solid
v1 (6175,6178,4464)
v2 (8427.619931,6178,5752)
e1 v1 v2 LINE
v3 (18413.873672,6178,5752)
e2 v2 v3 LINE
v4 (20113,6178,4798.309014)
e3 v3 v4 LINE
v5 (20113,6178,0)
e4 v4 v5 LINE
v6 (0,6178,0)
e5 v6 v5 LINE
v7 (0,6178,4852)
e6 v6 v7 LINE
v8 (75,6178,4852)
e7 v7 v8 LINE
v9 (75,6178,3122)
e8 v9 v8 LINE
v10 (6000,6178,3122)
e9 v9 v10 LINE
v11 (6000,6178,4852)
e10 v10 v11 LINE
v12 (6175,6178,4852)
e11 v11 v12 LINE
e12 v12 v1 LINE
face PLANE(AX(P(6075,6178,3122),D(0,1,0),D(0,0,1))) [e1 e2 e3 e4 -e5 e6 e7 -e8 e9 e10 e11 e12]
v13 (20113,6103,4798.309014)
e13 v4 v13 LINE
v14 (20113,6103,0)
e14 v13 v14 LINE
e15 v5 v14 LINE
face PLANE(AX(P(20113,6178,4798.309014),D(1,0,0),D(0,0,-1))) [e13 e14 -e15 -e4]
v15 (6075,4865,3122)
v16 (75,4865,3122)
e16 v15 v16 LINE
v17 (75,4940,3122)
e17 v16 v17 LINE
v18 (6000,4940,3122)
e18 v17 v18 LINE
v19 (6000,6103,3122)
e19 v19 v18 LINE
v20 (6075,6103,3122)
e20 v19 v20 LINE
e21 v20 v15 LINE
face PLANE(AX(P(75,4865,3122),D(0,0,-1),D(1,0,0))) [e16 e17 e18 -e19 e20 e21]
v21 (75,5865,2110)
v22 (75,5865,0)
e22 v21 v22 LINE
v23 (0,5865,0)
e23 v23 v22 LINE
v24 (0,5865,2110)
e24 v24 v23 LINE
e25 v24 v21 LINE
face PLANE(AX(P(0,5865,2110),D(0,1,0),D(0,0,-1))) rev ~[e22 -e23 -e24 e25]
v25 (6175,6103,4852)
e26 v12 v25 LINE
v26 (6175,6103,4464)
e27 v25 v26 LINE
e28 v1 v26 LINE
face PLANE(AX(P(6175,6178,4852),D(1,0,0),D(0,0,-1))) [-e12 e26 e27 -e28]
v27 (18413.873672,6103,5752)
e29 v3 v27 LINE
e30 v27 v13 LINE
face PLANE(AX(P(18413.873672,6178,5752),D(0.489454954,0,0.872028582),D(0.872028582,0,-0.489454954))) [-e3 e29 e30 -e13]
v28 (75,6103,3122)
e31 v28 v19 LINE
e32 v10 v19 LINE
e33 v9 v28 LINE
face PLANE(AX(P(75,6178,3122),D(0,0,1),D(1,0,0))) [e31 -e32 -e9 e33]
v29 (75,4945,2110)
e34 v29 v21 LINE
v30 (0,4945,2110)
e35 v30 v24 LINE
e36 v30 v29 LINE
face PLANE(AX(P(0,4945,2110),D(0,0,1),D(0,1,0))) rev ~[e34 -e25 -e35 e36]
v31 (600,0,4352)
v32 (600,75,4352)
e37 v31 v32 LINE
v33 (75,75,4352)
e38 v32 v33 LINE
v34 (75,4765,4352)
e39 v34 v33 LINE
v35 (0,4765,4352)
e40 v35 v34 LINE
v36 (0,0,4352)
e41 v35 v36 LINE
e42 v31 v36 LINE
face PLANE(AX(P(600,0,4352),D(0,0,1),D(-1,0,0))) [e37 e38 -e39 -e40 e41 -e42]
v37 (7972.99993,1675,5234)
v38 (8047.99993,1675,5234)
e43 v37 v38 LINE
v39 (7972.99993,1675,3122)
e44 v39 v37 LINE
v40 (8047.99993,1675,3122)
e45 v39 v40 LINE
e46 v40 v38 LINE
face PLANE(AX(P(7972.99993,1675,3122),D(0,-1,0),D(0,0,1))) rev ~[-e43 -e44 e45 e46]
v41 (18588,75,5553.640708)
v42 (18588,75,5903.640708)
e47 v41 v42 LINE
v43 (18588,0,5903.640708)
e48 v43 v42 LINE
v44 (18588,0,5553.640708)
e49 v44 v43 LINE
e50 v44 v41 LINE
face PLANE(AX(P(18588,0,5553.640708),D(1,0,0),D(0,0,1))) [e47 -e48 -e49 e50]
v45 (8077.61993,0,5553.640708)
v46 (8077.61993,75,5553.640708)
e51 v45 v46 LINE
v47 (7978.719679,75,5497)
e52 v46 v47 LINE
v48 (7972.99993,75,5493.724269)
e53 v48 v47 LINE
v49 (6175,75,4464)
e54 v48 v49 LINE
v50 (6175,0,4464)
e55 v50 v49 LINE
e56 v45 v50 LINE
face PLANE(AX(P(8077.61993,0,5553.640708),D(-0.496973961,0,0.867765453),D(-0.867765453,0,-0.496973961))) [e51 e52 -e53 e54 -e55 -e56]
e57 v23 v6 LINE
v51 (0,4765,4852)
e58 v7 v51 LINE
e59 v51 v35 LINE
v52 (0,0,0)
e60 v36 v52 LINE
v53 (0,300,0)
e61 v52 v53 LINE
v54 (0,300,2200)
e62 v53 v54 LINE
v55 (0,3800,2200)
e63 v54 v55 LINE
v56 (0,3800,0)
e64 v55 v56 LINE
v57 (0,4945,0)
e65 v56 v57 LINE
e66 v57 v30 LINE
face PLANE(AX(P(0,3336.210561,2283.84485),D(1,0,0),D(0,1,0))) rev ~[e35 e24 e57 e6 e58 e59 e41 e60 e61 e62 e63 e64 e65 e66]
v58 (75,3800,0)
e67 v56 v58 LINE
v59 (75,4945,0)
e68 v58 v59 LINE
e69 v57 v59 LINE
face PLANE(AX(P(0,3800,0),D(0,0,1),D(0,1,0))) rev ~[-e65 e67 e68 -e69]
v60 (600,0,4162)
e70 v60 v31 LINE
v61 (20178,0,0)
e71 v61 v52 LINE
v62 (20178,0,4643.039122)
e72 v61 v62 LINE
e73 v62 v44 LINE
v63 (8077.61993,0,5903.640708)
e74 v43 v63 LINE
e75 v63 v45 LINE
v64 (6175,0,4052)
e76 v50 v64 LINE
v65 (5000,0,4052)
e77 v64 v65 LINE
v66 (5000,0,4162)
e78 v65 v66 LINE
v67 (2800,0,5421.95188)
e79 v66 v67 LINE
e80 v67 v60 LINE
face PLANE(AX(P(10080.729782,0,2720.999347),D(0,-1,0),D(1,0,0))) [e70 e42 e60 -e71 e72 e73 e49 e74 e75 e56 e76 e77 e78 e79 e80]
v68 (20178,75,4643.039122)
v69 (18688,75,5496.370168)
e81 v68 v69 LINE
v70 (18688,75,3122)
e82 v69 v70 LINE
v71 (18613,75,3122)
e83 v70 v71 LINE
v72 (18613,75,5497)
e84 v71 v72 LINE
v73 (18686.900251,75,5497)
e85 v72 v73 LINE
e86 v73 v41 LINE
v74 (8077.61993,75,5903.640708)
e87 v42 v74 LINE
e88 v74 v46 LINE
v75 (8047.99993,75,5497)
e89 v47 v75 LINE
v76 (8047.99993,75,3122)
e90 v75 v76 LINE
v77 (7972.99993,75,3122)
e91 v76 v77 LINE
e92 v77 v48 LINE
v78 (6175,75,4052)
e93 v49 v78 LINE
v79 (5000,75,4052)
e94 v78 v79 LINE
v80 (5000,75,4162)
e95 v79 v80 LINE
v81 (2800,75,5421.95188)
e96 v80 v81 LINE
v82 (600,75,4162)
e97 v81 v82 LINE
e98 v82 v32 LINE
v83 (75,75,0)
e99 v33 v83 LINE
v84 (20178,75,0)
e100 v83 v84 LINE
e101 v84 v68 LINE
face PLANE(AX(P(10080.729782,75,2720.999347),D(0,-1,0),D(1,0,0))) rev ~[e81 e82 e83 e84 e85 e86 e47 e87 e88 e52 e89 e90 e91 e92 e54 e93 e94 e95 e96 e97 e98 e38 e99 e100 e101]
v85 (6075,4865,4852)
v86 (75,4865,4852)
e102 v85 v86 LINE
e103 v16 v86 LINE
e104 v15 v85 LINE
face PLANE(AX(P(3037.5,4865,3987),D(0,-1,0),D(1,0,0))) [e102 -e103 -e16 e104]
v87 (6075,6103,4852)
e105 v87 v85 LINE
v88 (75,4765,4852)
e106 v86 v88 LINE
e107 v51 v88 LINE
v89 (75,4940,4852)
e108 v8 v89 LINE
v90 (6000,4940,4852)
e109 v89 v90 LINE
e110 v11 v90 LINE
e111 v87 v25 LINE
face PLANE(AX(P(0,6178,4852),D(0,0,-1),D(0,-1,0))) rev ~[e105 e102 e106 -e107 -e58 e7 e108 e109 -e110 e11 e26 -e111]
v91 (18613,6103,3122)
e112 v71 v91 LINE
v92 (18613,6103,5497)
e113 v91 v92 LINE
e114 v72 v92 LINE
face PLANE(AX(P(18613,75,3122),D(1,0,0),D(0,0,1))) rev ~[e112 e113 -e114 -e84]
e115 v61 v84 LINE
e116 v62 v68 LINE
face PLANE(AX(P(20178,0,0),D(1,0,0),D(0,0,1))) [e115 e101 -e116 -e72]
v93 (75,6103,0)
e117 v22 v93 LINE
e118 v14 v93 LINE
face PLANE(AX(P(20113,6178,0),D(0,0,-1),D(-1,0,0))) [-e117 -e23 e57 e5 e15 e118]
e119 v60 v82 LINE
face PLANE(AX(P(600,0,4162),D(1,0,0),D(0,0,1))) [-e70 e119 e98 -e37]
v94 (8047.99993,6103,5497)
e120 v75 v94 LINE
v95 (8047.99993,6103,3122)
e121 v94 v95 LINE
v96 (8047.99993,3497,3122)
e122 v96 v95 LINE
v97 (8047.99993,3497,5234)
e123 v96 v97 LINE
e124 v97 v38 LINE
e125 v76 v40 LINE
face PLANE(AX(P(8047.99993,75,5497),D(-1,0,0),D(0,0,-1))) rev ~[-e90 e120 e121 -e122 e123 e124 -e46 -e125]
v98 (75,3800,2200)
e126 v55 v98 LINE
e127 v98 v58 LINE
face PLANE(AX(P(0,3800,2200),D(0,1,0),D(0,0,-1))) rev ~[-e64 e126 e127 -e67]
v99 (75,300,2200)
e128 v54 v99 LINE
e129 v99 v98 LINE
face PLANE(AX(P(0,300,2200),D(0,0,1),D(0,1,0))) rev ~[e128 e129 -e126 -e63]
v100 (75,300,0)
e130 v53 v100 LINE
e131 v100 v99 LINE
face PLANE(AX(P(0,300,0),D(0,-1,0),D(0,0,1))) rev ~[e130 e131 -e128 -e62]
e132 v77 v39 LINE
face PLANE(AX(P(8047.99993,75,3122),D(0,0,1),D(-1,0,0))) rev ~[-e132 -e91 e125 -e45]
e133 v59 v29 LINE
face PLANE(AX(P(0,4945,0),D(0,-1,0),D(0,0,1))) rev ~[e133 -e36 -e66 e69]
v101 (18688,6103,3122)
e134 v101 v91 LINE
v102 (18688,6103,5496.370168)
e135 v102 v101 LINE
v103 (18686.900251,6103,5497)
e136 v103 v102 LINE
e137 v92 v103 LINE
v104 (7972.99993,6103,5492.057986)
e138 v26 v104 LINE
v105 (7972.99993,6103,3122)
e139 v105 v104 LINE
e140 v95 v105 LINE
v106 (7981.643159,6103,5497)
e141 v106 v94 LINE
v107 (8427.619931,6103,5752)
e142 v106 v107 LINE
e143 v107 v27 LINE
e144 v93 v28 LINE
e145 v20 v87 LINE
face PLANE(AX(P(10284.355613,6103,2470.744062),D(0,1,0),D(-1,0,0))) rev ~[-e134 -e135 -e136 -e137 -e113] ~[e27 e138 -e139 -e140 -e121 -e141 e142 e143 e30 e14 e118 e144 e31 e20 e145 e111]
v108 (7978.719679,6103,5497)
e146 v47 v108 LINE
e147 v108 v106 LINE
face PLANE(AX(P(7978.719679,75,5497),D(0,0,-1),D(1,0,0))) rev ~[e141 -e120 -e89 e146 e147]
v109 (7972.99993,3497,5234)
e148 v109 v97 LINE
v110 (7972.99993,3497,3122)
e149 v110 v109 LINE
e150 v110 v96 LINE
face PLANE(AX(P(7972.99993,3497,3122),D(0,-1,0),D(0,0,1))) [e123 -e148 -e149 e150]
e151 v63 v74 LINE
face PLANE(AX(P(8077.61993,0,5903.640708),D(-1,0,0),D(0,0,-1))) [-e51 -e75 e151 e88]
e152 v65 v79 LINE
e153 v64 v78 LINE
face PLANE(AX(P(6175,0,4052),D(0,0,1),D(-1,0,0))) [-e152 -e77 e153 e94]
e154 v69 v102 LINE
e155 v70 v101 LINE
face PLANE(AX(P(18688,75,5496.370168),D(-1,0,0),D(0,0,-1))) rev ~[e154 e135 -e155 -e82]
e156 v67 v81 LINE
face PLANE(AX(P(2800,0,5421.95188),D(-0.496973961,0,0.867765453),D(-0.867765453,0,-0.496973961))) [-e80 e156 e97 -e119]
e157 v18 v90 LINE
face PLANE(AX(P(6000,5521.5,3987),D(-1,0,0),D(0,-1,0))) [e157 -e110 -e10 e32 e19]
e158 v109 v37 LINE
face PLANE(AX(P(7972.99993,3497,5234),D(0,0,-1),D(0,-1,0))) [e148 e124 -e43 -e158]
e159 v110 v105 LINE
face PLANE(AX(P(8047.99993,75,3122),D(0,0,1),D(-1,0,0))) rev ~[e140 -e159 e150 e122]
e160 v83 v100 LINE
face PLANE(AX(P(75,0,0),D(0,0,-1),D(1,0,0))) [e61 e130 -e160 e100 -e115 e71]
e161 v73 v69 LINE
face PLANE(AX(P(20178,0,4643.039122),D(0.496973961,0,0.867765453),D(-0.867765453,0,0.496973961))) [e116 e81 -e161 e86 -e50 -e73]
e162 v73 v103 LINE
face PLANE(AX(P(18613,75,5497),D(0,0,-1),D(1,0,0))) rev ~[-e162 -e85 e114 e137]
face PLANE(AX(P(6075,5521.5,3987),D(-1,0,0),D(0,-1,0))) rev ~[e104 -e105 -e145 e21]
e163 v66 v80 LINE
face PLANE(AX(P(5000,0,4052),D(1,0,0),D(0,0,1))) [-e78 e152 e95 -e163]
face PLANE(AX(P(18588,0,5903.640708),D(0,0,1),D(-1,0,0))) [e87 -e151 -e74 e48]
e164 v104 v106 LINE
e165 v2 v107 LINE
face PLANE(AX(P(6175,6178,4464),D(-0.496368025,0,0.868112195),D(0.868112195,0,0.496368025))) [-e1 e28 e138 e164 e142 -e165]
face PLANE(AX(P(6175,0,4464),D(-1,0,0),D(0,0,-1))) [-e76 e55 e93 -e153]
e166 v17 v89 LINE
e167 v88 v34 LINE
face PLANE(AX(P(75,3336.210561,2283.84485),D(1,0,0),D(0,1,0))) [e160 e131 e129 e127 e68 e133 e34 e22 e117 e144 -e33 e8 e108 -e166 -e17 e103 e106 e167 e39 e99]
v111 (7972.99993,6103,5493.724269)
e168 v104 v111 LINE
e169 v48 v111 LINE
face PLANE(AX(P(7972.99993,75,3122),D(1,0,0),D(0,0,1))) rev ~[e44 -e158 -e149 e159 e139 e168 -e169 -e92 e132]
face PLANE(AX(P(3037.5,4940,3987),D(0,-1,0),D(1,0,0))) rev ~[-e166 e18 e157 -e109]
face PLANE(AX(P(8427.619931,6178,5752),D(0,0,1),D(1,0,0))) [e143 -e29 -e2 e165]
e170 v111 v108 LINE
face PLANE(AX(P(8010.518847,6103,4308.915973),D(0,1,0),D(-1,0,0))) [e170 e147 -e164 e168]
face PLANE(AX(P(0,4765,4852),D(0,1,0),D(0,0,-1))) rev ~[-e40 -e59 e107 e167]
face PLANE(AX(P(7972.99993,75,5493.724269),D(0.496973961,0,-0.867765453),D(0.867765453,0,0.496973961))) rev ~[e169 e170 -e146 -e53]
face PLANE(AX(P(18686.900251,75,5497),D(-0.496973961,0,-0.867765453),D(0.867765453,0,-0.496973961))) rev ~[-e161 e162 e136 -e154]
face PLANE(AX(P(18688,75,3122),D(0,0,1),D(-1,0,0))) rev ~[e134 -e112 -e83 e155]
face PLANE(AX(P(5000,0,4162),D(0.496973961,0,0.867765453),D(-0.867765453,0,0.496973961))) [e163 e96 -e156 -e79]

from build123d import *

# Parameters (mm, degrees)
F1_DEPTH  = 75
F3_DEPTH  = 75
F5_DEPTH  = 75
F6_W      = 1313
F6_H      = 1730
F7_DEPTH  = 75
F8_W      = 5925
F8_H      = 1730
F9_DEPTH  = 75
F11_DEPTH = 6028
F12_W     = 1822
F12_H     = 2112
F13_DEPTH = 75
F15_DEPTH = 6028


with BuildPart() as f1:
    # F0 (on Right) → F1 (new body)
    with BuildSketch(Plane.YZ):
        Polygon((0, 4352), (0, 0), (300, 0), (300, 2200), (3800, 2200), (3800, 0), (4945, 0), (4945, 2110), (5865, 2110), (5865, 0), (6178, 0), (6178, 4852), (4765, 4852), (4765, 4352), align=None)
    extrude(amount=F1_DEPTH)

    # F2 (on face) → F3 (join)
    with BuildSketch(Plane.XZ):
        Polygon((75, 4352), (75, 0), (20178, 0), (20178, 4643.0391220405), (18588, 5553.6407079484), (18588, 5903.6407079484), (8077.61993, 5903.6407079484), (8077.61993, 5553.6407079484), (6175, 4464), (6175, 4052), (5000, 4052), (5000, 4162), (2800, 5421.9518798725), (600, 4162), (600, 4352), align=None)
    extrude(amount=-F3_DEPTH)

    # F4 (on face) → F5 (join)
    with BuildSketch(Plane(origin=(0, 6178, 0), x_dir=(-1, 0, 0), z_dir=(0, 1, 0))):
        Polygon((-20113, 4798.3090141813), (-20113, 0), (-75, 0), (-75, 3122), (-6075, 3122), (-6075, 4852), (-6175, 4852), (-6175, 4464), (-8427.6199314719, 5752), (-18413.8736724854, 5752), align=None)
    extrude(amount=-F5_DEPTH)

    # F6 (on face) → F7 (join)
    with BuildSketch(Plane(origin=(6075, 0, 0), x_dir=(0, -1, 0), z_dir=(-1, 0, 0))):
        with Locations((-5521.5, 3987)):
            Rectangle(F6_W, F6_H)
    extrude(amount=F7_DEPTH)

    # F8 (on face) → F9 (join)
    with BuildSketch(Plane.XZ.offset(-4865)):
        with Locations((3037.5, 3987)):
            Rectangle(F8_W, F8_H)
    extrude(amount=-F9_DEPTH)

    # F10 (on face) → F11 (join, through all)
    with BuildSketch(Plane(origin=(0, 75, 0), x_dir=(-1, 0, 0), z_dir=(0, 1, 0))):
        Polygon((-8047.99993, 5497), (-8047.99993, 3122), (-7972.99993, 3122), (-7972.99993, 5493.7242690064), (-7978.7196787467, 5497), align=None)
    extrude(amount=F11_DEPTH)

    # F12 (on face) → F13 (cut, through all)
    with BuildSketch(Plane(origin=(7972.99993, 0, 0), x_dir=(0, -1, 0), z_dir=(-1, 0, 0))):
        with Locations((-2586, 4178)):
            Rectangle(F12_W, F12_H)
    extrude(amount=-F13_DEPTH, mode=Mode.SUBTRACT)

    # F14 (on face) → F15 (join, through all)
    with BuildSketch(Plane(origin=(0, 75, 0), x_dir=(-1, 0, 0), z_dir=(0, 1, 0))):
        Polygon((-18688, 5496.3701679542), (-18688, 3122), (-18613, 3122), (-18613, 5497), (-18686.9002512533, 5497), align=None)
    extrude(amount=F15_DEPTH)


solid = f1.part
